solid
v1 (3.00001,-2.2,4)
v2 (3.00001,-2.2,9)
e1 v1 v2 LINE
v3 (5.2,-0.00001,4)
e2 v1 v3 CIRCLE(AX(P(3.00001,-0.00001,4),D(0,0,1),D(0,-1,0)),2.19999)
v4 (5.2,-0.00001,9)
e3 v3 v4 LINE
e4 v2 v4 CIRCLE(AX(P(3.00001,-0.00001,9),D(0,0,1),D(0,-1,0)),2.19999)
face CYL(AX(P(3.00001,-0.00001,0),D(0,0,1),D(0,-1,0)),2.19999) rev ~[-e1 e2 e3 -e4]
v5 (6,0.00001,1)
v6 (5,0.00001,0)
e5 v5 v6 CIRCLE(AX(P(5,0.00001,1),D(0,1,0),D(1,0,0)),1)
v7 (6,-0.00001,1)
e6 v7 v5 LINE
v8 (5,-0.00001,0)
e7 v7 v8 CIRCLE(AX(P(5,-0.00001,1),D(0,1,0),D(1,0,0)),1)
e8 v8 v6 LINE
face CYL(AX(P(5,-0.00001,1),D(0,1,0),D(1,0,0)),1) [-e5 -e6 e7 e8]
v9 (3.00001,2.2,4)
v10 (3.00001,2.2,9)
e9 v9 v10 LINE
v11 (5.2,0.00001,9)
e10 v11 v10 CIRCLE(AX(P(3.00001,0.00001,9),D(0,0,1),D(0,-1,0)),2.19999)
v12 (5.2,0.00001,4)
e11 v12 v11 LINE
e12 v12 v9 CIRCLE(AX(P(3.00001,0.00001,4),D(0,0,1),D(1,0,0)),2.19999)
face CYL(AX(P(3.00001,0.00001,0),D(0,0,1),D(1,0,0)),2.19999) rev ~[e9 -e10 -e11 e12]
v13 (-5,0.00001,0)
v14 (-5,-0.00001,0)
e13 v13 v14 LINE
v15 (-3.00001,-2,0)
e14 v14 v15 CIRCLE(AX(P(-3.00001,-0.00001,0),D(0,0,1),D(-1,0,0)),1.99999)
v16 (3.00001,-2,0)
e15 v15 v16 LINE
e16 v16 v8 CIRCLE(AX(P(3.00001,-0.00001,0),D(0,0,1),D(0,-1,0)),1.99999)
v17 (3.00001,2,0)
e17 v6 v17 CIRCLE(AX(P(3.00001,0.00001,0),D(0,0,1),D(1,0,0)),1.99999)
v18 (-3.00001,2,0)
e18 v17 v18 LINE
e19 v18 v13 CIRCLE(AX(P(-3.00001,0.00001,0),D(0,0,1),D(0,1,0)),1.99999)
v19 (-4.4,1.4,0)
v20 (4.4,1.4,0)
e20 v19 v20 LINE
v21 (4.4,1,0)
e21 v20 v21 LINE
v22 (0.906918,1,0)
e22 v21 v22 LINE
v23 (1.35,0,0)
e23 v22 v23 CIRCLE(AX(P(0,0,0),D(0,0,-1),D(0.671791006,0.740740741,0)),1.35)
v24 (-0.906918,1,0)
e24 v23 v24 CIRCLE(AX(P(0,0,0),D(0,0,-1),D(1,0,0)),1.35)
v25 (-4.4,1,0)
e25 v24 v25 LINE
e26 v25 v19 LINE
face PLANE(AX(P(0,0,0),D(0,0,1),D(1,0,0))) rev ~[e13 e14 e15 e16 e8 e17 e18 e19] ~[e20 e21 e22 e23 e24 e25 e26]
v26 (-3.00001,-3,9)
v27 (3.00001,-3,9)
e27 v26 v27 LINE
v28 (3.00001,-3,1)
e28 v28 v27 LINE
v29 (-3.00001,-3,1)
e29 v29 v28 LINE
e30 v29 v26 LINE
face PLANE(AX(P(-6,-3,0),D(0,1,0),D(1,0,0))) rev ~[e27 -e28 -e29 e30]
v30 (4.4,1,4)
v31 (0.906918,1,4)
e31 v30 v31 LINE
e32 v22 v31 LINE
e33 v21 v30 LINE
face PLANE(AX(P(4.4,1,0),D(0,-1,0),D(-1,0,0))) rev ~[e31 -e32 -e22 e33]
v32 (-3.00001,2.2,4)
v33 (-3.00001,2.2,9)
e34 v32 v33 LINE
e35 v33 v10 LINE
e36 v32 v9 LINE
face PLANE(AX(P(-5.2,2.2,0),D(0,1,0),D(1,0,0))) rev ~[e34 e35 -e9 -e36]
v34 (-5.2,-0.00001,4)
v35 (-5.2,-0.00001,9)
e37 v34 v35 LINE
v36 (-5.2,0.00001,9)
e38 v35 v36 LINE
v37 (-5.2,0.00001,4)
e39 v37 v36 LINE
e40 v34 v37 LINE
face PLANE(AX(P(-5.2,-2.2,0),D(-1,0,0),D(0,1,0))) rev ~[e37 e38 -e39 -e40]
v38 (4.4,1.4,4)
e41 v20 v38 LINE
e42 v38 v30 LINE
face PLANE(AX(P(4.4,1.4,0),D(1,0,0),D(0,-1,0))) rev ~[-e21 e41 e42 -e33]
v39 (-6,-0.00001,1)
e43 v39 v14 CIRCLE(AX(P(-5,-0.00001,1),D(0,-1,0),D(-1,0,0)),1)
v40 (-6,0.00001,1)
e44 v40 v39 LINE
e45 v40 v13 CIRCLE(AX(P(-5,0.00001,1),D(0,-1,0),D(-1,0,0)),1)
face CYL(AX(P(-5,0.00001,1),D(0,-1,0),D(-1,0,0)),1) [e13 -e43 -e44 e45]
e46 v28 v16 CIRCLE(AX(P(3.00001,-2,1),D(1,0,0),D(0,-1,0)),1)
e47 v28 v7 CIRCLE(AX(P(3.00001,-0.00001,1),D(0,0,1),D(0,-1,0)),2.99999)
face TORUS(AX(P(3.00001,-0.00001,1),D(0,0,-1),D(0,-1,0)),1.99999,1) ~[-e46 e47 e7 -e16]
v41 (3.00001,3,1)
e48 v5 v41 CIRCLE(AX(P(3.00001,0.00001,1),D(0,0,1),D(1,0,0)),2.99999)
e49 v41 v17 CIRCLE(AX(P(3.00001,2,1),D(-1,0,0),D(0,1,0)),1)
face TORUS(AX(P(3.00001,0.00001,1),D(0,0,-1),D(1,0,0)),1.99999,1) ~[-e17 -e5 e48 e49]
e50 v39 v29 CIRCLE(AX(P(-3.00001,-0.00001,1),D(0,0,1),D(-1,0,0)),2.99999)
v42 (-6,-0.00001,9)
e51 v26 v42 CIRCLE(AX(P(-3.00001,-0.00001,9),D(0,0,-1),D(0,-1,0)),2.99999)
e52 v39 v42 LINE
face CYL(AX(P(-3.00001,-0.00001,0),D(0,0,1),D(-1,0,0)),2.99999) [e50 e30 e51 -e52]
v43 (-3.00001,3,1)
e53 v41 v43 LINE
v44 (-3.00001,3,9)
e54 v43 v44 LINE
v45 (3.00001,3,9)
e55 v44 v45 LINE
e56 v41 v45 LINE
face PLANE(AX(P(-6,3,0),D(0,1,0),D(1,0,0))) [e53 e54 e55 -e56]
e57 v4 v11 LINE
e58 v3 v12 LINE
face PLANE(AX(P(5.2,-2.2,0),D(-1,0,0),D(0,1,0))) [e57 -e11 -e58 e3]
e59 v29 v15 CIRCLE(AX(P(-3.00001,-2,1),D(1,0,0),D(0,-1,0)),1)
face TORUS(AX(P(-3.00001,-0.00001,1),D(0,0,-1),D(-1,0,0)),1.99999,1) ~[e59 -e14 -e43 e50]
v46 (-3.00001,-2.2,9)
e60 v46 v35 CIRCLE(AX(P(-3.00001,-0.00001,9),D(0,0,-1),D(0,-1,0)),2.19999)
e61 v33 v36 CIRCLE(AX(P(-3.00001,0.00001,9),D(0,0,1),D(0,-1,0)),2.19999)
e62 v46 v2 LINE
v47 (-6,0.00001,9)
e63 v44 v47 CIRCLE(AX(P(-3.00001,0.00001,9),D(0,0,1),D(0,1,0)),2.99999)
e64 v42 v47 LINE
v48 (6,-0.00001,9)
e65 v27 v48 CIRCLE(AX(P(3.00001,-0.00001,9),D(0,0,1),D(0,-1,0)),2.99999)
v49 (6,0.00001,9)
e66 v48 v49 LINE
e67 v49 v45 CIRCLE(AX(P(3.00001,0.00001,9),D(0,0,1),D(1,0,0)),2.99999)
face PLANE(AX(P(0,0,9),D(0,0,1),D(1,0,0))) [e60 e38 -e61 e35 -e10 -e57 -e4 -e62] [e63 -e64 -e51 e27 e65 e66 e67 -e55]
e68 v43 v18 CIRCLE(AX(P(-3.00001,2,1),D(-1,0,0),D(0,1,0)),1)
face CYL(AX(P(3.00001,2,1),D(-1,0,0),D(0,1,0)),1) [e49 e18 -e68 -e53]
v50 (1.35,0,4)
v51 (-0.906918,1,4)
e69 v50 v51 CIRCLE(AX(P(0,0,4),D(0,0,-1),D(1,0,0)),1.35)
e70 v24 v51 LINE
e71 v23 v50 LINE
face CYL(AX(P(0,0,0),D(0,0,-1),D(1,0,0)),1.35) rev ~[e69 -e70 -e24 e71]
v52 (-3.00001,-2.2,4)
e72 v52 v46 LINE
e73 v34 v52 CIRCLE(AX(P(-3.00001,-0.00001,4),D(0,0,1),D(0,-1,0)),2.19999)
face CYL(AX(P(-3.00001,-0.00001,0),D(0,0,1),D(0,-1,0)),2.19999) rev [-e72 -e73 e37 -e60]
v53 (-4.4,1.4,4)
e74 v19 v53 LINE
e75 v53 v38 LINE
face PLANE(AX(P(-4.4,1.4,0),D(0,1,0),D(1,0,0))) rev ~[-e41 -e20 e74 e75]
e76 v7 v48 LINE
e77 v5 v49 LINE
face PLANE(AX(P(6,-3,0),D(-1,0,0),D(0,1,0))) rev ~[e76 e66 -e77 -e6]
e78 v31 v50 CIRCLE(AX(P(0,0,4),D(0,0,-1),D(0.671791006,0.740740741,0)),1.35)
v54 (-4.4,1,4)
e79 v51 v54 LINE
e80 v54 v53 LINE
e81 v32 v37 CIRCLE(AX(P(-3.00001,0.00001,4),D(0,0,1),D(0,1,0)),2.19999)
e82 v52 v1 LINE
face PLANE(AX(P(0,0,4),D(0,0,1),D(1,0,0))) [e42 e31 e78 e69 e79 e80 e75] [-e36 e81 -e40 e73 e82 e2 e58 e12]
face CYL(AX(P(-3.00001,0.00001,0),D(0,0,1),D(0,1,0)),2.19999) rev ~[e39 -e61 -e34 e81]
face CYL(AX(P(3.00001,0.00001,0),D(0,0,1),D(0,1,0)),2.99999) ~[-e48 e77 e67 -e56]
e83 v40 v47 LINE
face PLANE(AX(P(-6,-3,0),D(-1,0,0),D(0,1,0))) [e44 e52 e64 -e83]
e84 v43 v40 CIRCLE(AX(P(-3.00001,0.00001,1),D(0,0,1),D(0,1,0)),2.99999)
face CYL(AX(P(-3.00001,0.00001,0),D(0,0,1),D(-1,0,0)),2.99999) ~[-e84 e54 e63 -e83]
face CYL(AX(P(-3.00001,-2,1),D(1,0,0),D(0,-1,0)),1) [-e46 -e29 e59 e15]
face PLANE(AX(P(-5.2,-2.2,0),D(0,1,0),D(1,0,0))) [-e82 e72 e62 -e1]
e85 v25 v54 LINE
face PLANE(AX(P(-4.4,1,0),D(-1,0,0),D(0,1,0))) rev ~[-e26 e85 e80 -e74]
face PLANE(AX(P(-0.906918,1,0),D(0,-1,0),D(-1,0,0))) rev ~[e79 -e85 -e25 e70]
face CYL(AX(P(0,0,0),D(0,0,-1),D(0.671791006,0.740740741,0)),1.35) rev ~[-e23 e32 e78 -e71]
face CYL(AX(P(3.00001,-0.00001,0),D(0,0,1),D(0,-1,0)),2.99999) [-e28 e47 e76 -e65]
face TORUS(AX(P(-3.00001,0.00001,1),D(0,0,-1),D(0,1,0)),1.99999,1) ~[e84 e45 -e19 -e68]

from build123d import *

# Parameters (mm, degrees)
F0_W         = 12
F0_H         = 6
F0_W_2       = 10.4
F0_H_2       = 4.4
F1_DEPTH     = 9
F2_R         = 2.19999
F3_R         = 2.99999
F4_DEPTH     = 4
F5_T4_DEPTH  = 19
F5_S5_R      = 2.99999
F5_T6_DEPTH  = 11
F5_T10_DEPTH = 19
F5_S11_R     = 2.99999
F5_T12_DEPTH = 11
F5_T16_DEPTH = 19
F5_S17_R     = 2.99999
F5_T18_DEPTH = 11
F5_T22_DEPTH = 19
F5_S23_R     = 2.99999
F5_T24_DEPTH = 11
F6_R         = 1


# Not quite as in the source:
# - a fillet or chamfer that OpenCascade refuses, or shapes differently, is made with other operations: its cross-section is extruded or revolved along the edge and cut away or added
# - a fillet or chamfer is up to 0.001 mm smaller than in the source, because OpenCascade refuses the exact size


with BuildPart() as f1:
    # F0 (on Top) → F1 (new body)
    with BuildSketch(Plane.XY):
        Rectangle(F0_W, F0_H)
        Rectangle(F0_W_2, F0_H_2, mode=Mode.SUBTRACT)
    extrude(amount=F1_DEPTH)

    # F2 (radius 2.2 in the source; OpenCascade refuses exactly that, so slightly less here)
    f2_edges = [f1.edges().sort_by_distance(p)[0] for p in [
        (-5.2, 2.2, 4.5),
        (-5.2, -2.2, 4.5),
        (5.2, 2.2, 4.5),
        (5.2, -2.2, 4.5),
    ]]
    fillet(f2_edges, radius=F2_R)

    # F3 (radius 3 in the source; OpenCascade refuses exactly that, so slightly less here)
    f3_edges = [f1.edges().sort_by_distance(p)[0] for p in [
        (-6, 3, 4.5),
        (6, 3, 4.5),
        (-6, -3, 4.5),
        (6, -3, 4.5),
    ]]
    fillet(f3_edges, radius=F3_R)

    # F0 (on Top) → F4 (join)
    with BuildSketch(Plane.XY):
        Rectangle(F0_W_2, F0_H_2)
        with BuildLine():
            Line((-0.9069178574, 1), (-4.4, 1))
            Line((-4.4, 1), (-4.4, 1.4))
            Line((-4.4, 1.4), (4.4, 1.4))
            Line((4.4, 1.4), (4.4, 1))
            Line((4.4, 1), (0.9069178574, 1))
            ThreePointArc((0.9069178574, 1), (1.2342688336, 0.5468824794), (1.35, 0))
            ThreePointArc((1.35, 0), (-0.5468824794, -1.2342688336), (-0.9069178574, 1))
        make_face(mode=Mode.SUBTRACT)
    extrude(amount=F4_DEPTH)

    # F5: fillet of radius 3 on 4 edges, made by hand


with BuildPart() as f5_tool2:
    # F5_s3 → F5_t4 (new body)
    with BuildSketch(Plane.XY.offset(-7.5)):
        with BuildLine():
            ThreePointArc((-2.2, -2.2), (-4.3213203436, -1.3213203436), (-5.2, 0.8))
            Line((-5.2, 0.8), (-5.2, -2.2))
            Line((-5.2, -2.2), (-2.2, -2.2))
        make_face()
    extrude(amount=F5_T4_DEPTH)

    # F5_s5 → F5_t6 (cut, symmetric)
    with BuildSketch(Plane.XY.offset(2)):
        with Locations((-3.00001, -1e-05)):
            Circle(F5_S5_R)
    extrude(amount=F5_T6_DEPTH, both=True, mode=Mode.SUBTRACT)


with BuildPart() as f1_1:
    add(f1.part)

    # F5_t1: cut F5_tool2
    add(f5_tool2.part, mode=Mode.SUBTRACT)


with BuildPart() as f5_tool8:
    # F5_s9 → F5_t10 (new body)
    with BuildSketch(Plane.XY.offset(-7.5)):
        with BuildLine():
            ThreePointArc((5.2, 0.8), (4.3213203436, -1.3213203436), (2.2, -2.2))
            Line((2.2, -2.2), (5.2, -2.2))
            Line((5.2, -2.2), (5.2, 0.8))
        make_face()
    extrude(amount=F5_T10_DEPTH)

    # F5_s11 → F5_t12 (cut, symmetric)
    with BuildSketch(Plane.XY.offset(2)):
        with Locations((3.00001, -1e-05)):
            Circle(F5_S11_R)
    extrude(amount=F5_T12_DEPTH, both=True, mode=Mode.SUBTRACT)


with BuildPart() as f1_2:
    add(f1_1.part)

    # F5_t7: cut F5_tool8
    add(f5_tool8.part, mode=Mode.SUBTRACT)


with BuildPart() as f5_tool14:
    # F5_s15 → F5_t16 (new body)
    with BuildSketch(Plane.XY.offset(-7.5)):
        with BuildLine():
            ThreePointArc((-5.2, -0.8), (-4.3213203436, 1.3213203436), (-2.2, 2.2))
            Line((-2.2, 2.2), (-5.2, 2.2))
            Line((-5.2, 2.2), (-5.2, -0.8))
        make_face()
    extrude(amount=F5_T16_DEPTH)

    # F5_s17 → F5_t18 (cut, symmetric)
    with BuildSketch(Plane.XY.offset(2)):
        with Locations((-3.00001, 1e-05)):
            Circle(F5_S17_R)
    extrude(amount=F5_T18_DEPTH, both=True, mode=Mode.SUBTRACT)


with BuildPart() as f1_3:
    add(f1_2.part)

    # F5_t13: cut F5_tool14
    add(f5_tool14.part, mode=Mode.SUBTRACT)


with BuildPart() as f5_tool20:
    # F5_s21 → F5_t22 (new body)
    with BuildSketch(Plane.XY.offset(-7.5)):
        with BuildLine():
            ThreePointArc((5.2, -0.8), (4.3213203436, 1.3213203436), (2.2, 2.2))
            Line((2.2, 2.2), (5.2, 2.2))
            Line((5.2, 2.2), (5.2, -0.8))
        make_face()
    extrude(amount=F5_T22_DEPTH)

    # F5_s23 → F5_t24 (cut, symmetric)
    with BuildSketch(Plane.XY.offset(2)):
        with Locations((3.00001, 1e-05)):
            Circle(F5_S23_R)
    extrude(amount=F5_T24_DEPTH, both=True, mode=Mode.SUBTRACT)


with BuildPart() as f1_4:
    add(f1_3.part)

    # F5_t19: cut F5_tool20
    add(f5_tool20.part, mode=Mode.SUBTRACT)

    # F6
    f6_edges = [f1_4.edges().sort_by_distance(p)[0] for p in [
        (0, -3, 0),
    ]]
    fillet(f6_edges, radius=F6_R)


solid = f1_4.part
